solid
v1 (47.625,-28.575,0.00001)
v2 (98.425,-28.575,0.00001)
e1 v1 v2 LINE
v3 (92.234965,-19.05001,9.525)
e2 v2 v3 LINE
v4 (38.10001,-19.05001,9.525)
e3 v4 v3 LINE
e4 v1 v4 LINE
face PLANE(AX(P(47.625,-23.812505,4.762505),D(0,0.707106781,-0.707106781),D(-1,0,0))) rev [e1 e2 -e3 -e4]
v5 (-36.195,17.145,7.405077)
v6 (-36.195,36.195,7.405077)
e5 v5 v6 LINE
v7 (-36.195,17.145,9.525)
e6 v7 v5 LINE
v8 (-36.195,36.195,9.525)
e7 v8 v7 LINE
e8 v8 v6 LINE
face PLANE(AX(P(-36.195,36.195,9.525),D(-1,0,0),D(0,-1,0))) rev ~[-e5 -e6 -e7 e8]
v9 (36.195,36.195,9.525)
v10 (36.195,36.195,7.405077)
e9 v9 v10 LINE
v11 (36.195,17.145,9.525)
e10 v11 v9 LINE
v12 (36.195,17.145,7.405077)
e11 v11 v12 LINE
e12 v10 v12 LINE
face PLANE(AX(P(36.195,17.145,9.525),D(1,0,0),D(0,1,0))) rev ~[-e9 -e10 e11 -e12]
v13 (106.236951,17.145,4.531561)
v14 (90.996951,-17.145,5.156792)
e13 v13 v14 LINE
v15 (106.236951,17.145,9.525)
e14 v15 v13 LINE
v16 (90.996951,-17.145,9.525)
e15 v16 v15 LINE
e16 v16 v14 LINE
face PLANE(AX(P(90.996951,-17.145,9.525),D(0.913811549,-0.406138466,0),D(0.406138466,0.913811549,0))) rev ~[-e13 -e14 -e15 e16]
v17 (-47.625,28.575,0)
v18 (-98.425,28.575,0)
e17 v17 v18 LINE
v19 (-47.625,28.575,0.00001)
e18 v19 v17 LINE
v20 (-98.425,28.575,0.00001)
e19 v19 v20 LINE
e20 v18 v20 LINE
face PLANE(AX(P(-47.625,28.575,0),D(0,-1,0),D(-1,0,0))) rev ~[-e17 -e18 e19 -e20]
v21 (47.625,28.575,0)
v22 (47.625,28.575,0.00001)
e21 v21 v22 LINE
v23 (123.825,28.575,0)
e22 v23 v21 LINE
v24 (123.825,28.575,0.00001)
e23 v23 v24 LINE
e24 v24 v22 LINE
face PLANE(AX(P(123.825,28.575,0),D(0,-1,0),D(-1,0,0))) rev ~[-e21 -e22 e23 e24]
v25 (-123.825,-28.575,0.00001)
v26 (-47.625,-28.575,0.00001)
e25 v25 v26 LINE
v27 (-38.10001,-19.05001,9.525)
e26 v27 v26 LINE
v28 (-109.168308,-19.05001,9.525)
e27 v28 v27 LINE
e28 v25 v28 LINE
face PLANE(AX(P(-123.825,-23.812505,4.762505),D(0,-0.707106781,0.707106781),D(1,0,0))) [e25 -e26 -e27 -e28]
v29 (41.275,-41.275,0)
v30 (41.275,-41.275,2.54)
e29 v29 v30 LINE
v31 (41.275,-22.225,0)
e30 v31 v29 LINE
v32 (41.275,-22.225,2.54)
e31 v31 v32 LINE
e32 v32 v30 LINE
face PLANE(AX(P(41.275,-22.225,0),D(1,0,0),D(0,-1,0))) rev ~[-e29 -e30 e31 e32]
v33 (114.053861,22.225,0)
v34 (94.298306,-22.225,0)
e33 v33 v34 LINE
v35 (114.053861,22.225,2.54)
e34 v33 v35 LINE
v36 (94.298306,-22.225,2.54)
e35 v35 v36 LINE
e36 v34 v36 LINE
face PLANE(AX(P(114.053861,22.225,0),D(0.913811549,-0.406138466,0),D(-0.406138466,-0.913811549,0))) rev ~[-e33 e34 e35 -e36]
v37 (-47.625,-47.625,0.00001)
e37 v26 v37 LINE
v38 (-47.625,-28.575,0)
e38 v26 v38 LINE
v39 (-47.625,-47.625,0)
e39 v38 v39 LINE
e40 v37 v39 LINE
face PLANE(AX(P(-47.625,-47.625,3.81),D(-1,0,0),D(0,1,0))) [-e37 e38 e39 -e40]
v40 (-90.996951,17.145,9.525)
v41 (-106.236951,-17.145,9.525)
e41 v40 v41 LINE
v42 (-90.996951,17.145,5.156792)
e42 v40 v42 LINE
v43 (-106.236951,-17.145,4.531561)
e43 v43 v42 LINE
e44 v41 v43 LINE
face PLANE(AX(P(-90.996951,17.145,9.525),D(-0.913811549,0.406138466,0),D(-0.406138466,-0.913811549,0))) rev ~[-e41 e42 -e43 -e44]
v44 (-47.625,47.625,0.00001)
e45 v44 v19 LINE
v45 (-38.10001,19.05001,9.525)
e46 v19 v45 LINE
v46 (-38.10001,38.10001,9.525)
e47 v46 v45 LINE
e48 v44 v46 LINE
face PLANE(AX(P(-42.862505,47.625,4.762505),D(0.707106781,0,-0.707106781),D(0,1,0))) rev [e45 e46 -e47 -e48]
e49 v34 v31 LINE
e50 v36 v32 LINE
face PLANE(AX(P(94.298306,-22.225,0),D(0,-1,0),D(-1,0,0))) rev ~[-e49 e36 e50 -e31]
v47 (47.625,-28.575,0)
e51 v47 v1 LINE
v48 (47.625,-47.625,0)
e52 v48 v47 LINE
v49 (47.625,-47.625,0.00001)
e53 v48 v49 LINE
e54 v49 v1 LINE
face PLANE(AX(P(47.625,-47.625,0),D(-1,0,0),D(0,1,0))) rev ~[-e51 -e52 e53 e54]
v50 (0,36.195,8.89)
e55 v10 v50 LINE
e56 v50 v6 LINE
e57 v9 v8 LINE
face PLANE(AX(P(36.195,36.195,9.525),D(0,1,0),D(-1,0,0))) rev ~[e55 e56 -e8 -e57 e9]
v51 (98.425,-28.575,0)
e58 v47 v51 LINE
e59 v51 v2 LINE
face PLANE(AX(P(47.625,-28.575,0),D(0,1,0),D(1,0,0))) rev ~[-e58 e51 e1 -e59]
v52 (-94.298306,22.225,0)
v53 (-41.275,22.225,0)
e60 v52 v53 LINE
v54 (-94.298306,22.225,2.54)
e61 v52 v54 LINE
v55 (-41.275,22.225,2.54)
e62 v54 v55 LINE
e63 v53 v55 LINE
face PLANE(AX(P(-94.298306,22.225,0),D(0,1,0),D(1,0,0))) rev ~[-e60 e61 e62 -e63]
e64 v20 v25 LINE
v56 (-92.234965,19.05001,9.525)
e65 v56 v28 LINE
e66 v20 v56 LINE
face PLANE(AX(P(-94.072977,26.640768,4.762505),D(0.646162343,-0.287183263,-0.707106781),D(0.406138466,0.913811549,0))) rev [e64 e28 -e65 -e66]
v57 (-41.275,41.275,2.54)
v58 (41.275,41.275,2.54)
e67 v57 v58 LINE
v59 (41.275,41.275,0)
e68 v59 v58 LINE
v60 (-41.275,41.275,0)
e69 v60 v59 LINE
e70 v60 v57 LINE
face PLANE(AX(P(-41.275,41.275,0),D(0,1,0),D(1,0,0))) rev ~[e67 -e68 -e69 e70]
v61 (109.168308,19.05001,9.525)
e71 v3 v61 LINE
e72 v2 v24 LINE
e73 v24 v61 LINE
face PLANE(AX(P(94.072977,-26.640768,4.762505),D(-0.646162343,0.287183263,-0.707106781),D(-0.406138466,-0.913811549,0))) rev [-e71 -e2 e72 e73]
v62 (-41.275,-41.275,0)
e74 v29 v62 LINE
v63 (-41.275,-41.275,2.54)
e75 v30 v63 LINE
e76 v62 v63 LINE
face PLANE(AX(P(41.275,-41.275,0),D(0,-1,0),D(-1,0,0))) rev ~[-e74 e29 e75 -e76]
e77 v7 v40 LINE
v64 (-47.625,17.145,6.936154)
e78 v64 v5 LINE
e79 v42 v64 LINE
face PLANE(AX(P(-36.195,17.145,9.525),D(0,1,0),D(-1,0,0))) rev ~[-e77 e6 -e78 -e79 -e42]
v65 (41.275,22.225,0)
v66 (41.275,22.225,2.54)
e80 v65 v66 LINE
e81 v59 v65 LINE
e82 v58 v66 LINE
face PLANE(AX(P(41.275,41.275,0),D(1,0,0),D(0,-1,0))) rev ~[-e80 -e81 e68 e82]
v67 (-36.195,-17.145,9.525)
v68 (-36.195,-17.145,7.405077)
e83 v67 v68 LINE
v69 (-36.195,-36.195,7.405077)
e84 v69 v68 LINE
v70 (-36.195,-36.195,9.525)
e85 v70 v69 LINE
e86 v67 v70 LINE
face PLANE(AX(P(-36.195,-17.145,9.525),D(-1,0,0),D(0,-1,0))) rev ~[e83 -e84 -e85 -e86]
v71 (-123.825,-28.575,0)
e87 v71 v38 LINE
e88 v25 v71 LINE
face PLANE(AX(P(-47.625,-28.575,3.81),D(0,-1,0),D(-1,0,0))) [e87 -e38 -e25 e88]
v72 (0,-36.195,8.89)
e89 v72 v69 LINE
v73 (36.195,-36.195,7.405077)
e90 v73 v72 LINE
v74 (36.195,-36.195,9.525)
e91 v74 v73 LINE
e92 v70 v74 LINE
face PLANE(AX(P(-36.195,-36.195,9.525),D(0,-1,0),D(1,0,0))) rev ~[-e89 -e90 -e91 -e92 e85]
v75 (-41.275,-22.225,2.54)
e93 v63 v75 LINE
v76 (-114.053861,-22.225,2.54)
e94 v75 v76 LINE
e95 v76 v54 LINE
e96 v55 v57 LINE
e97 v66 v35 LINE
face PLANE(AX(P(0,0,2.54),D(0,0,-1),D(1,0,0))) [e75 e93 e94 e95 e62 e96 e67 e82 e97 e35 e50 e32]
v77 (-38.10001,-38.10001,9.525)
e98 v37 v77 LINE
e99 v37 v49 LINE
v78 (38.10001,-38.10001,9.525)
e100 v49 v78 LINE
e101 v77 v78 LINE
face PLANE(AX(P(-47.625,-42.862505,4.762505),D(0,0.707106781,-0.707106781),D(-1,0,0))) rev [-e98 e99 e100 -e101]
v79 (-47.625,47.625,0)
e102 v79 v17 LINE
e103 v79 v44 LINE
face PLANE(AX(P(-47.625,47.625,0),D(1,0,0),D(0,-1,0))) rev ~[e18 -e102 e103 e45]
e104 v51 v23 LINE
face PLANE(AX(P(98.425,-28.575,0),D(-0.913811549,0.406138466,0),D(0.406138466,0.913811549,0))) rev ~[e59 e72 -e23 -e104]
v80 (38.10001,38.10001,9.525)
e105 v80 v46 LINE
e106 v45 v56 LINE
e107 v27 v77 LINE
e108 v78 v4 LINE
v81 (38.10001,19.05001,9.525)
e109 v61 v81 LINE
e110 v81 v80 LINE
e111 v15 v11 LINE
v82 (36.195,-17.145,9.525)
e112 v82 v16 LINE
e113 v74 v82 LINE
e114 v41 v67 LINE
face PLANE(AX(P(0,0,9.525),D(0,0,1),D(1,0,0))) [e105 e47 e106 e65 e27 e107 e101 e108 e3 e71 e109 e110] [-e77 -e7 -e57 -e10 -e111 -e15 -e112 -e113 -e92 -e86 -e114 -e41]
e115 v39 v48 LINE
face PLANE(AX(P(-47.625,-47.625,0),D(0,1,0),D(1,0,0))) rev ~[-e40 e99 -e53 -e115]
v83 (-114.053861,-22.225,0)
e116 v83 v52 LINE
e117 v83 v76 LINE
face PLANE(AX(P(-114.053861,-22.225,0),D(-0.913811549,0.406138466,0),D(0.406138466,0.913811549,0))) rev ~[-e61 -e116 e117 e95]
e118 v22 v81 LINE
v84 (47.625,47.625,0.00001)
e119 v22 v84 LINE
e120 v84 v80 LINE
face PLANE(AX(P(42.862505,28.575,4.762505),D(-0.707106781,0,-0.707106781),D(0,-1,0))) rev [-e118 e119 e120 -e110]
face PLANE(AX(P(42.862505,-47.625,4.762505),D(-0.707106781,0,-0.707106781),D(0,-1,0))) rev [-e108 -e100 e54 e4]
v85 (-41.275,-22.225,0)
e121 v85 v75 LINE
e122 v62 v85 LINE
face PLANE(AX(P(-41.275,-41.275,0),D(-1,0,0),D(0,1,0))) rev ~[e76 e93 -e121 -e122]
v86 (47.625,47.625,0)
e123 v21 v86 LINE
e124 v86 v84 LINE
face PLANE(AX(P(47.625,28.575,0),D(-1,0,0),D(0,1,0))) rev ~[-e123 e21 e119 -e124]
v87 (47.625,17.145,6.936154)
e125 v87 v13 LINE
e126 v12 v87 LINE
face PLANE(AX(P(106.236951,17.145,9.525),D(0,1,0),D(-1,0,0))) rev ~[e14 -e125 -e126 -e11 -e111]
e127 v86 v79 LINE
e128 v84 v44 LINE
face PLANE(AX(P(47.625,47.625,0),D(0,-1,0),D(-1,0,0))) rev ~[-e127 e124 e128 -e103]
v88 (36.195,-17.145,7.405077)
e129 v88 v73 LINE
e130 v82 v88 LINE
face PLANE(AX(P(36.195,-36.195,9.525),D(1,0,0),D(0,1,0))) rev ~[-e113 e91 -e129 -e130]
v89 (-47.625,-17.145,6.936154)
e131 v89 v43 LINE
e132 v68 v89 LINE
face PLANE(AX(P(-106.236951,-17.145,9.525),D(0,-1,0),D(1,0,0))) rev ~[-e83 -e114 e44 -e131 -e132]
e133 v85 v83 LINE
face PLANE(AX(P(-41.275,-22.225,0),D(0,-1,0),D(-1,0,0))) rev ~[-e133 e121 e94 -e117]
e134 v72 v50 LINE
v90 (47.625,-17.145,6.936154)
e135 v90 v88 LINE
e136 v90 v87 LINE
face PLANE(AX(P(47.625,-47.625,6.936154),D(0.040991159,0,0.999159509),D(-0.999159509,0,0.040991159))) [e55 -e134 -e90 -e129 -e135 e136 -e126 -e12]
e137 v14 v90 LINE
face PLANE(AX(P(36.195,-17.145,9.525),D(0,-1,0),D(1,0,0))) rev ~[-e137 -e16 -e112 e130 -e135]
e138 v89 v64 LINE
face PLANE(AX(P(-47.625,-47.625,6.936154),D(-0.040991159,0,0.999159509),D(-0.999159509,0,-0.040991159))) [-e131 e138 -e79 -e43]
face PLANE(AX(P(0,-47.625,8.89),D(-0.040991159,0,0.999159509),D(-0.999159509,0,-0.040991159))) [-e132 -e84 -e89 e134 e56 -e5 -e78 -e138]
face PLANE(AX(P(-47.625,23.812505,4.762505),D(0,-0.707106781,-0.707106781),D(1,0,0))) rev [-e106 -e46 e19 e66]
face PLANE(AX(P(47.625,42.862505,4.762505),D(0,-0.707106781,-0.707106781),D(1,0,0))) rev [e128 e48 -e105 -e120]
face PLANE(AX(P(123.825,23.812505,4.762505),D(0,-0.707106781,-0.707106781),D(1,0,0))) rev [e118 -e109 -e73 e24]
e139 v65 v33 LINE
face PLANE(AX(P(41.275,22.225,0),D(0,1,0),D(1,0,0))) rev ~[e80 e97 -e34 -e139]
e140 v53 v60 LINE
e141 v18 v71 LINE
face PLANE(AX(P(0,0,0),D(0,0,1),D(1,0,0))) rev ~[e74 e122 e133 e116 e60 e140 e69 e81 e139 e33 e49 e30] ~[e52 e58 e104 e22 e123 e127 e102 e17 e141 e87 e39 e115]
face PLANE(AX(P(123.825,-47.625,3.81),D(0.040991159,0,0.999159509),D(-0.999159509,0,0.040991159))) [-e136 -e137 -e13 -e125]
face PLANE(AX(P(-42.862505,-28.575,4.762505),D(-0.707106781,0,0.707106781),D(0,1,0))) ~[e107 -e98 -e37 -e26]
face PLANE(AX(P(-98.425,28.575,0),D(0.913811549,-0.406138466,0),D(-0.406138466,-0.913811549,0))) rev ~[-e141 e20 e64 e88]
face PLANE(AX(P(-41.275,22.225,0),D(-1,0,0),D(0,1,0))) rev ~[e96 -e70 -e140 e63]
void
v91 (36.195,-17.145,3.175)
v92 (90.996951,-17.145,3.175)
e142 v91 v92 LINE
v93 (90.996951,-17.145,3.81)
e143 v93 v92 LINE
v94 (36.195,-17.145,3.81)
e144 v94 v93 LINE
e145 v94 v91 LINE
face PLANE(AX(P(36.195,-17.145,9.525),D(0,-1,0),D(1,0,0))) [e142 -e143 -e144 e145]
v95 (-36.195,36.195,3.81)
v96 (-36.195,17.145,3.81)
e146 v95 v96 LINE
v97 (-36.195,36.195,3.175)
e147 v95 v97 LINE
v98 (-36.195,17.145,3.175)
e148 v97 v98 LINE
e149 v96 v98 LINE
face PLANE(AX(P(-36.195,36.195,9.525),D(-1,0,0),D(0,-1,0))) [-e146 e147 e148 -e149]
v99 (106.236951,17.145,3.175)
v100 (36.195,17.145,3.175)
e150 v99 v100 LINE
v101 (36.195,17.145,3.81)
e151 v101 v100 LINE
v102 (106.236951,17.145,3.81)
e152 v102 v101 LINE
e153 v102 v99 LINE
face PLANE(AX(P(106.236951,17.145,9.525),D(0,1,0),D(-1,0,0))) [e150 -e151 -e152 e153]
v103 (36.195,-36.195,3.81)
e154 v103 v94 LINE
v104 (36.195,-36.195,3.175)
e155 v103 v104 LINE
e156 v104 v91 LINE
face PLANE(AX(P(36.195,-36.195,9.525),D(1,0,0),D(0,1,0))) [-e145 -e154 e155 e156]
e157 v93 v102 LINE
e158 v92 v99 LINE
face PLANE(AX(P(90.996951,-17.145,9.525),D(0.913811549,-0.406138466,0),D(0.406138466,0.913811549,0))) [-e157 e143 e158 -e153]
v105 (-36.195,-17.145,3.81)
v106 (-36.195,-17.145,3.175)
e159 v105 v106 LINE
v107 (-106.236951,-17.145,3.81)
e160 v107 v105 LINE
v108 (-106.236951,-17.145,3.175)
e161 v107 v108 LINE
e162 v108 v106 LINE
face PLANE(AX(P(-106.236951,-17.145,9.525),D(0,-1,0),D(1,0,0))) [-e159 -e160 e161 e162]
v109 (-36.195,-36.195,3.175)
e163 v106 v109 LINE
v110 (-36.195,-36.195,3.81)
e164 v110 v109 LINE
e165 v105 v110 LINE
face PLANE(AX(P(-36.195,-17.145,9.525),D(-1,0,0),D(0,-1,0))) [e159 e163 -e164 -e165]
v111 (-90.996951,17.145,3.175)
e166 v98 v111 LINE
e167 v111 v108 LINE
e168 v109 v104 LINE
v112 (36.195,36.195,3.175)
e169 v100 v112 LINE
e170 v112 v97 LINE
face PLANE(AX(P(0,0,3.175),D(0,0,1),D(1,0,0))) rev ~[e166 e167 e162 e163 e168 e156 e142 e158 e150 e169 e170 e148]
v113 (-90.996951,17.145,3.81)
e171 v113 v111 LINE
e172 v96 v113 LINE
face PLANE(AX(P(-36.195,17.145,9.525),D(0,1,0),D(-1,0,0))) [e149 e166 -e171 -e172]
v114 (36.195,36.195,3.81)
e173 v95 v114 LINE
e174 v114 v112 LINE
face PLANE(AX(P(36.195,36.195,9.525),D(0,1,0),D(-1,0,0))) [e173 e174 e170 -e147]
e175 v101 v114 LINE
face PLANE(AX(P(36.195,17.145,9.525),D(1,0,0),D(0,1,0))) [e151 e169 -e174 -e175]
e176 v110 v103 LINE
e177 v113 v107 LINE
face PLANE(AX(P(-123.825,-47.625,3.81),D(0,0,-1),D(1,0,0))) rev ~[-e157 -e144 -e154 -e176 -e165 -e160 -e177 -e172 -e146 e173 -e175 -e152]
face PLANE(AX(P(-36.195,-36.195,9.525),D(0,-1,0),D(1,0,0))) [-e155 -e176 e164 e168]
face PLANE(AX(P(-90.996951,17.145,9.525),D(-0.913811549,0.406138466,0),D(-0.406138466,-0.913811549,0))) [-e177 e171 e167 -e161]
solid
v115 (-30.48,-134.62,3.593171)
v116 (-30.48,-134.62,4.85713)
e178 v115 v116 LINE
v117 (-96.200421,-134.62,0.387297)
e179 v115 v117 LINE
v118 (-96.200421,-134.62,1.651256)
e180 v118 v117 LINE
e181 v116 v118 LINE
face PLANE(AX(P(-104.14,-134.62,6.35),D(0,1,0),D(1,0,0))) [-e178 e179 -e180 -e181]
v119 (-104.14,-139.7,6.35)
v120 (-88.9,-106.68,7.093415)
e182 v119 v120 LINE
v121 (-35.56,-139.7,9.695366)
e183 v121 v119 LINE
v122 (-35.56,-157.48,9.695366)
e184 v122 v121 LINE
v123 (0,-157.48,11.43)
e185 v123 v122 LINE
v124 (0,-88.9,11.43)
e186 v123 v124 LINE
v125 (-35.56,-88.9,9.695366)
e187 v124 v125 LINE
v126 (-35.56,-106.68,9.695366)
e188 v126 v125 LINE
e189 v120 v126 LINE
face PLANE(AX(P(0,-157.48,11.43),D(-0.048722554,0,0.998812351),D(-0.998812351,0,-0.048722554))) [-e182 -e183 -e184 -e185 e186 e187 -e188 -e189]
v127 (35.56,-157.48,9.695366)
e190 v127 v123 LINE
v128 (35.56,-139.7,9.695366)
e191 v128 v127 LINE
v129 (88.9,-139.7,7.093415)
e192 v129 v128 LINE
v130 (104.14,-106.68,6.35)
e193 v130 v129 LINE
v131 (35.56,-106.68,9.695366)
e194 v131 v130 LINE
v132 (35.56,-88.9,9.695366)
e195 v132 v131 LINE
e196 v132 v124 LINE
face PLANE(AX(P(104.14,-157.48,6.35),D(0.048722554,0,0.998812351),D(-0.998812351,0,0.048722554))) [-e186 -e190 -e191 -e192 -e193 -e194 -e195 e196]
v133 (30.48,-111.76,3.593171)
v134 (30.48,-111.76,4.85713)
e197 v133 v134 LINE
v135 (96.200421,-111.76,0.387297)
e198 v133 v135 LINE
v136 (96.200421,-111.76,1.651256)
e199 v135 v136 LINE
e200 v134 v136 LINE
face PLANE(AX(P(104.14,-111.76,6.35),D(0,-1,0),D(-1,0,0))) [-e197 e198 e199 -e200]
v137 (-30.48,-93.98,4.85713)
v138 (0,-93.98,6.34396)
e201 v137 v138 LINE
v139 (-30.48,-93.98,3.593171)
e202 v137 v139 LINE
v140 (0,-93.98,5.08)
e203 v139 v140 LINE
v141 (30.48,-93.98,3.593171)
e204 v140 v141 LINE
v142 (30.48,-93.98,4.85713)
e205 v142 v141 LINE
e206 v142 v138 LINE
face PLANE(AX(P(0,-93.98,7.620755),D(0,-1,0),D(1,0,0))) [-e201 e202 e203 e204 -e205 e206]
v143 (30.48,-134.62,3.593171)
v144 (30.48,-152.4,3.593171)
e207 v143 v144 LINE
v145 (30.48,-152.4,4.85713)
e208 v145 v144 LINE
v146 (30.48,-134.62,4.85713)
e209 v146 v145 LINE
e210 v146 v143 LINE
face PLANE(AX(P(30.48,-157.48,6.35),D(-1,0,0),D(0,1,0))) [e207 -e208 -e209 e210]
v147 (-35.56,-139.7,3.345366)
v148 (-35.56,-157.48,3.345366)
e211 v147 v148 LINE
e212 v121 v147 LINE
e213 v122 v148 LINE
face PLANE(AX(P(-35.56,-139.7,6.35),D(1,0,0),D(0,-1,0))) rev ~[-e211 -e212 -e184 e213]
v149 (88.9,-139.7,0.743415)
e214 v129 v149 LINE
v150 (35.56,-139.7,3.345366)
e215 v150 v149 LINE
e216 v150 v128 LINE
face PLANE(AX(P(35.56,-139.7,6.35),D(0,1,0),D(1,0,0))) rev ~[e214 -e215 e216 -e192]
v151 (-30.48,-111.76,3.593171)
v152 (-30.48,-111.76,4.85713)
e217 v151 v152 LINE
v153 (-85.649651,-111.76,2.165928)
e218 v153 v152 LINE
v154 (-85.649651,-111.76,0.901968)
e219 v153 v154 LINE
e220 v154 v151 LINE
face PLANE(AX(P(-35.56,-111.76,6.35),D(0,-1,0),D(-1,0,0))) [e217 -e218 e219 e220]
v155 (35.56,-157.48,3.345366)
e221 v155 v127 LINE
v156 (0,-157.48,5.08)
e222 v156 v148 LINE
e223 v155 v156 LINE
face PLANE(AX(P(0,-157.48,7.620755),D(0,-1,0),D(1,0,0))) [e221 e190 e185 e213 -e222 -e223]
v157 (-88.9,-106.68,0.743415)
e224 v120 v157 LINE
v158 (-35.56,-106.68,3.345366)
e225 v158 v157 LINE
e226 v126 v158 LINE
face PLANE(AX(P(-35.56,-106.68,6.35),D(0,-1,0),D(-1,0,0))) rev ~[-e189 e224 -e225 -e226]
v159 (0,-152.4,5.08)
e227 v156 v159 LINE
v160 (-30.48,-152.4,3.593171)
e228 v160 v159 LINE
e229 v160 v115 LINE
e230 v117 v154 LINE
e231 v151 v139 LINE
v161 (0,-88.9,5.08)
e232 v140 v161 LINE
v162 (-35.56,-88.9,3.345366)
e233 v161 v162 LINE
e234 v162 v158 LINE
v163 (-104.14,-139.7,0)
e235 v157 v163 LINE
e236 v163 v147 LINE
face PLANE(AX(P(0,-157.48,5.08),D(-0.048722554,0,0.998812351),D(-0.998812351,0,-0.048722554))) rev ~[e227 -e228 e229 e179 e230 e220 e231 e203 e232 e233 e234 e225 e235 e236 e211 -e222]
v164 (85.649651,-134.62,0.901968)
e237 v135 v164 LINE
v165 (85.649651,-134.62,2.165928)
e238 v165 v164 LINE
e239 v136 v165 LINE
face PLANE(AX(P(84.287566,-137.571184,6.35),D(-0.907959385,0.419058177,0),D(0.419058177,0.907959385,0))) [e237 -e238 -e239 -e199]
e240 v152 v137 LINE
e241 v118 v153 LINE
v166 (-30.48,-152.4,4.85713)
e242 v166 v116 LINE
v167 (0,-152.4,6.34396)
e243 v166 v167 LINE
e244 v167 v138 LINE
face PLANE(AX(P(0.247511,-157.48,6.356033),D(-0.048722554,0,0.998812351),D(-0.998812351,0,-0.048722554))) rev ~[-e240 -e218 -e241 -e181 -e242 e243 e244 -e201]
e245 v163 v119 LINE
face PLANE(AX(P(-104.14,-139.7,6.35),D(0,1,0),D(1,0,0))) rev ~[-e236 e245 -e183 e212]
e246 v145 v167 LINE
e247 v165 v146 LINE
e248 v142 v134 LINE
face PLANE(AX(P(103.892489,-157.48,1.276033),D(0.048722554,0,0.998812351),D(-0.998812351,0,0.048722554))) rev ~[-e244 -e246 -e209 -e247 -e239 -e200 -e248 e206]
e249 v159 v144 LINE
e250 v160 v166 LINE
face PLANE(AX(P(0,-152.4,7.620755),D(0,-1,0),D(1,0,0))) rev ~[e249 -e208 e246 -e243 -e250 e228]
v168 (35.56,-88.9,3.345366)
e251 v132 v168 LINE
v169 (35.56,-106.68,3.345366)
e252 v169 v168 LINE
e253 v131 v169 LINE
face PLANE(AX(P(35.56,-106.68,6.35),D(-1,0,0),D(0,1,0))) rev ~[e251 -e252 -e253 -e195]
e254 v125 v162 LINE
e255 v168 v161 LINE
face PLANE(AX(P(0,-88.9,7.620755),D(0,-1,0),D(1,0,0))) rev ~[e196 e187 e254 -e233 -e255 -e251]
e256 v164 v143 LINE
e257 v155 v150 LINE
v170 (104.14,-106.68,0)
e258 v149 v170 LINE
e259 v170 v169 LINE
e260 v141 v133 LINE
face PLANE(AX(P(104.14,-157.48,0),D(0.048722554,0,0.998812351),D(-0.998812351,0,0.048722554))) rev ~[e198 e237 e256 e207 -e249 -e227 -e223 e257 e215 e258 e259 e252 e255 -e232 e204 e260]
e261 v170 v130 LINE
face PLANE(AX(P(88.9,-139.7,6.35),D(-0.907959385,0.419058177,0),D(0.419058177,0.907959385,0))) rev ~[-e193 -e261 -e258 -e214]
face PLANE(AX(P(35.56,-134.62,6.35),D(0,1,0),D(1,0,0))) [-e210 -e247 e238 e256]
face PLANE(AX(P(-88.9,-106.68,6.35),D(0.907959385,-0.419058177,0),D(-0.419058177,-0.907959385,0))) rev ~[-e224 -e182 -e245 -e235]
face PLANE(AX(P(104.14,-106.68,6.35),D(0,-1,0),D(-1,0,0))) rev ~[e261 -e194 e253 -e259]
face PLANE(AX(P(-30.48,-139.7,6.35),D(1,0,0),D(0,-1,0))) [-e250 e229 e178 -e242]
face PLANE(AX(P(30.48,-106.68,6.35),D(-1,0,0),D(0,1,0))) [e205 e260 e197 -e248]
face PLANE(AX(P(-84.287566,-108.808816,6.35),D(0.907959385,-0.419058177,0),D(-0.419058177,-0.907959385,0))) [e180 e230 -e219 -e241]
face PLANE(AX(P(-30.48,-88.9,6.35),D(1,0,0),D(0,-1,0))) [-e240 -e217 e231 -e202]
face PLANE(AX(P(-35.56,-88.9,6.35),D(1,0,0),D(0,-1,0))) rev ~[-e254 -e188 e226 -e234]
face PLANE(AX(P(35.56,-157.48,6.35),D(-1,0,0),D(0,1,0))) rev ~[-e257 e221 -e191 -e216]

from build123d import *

# Parameters (mm, degrees)
F1_DEPTH  = 9.525
F3_DEPTH  = 6.35
F5_DEPTH  = 83.82
F6_DEPTH  = 3.1271538462
F7_SIZE   = 9.52499
F9_DEPTH  = 6.35
F11_DEPTH = 68.58
F12_DEPTH = 3.3463658537
F14_DEPTH = 68.58
F15_T     = -5.08
F17_DEPTH = 2.54


# Not quite as in the source:
# - a fillet or chamfer is up to 0.001 mm smaller than in the source, because OpenCascade refuses the exact size
# - a length typed as a fraction of an inch, garbled in the dataset ("3 / 203.2 mm" for 3/8 in), is restored


with BuildPart() as f1:
    # F0 (on Top) → F1 (new body)
    with BuildSketch(Plane.XY):
        Polygon((-47.625, 28.575), (-98.425, 28.575), (-123.825, -28.575), (-47.625, -28.575), (-47.625, -47.625), (47.625, -47.625), (47.625, -28.575), (98.425, -28.575), (123.825, 28.575), (47.625, 28.575), (47.625, 47.625), (-47.625, 47.625), align=None)
    extrude(amount=F1_DEPTH)

    # F2 (on face) → F3 (cut)
    with BuildSketch(Plane.XY.offset(9.525)):
        Polygon((-36.195, 36.195), (-36.195, 17.145), (-90.9969505917, 17.145), (-106.2369505917, -17.145), (-36.195, -17.145), (-36.195, -36.195), (36.195, -36.195), (36.195, -17.145), (90.9969505917, -17.145), (106.2369505917, 17.145), (36.195, 17.145), (36.195, 36.195), align=None)
    extrude(amount=-F3_DEPTH, mode=Mode.SUBTRACT)

    # F4 (on face) → F5 (join, through all)
    with BuildSketch(Plane.XZ.offset(47.625)):
        Polygon((-47.625, 6.9361538462), (-47.625, 3.81), (47.625, 3.81), (47.625, 6.9361538462), (0, 8.89), align=None)
        Polygon((-47.625, 6.9361538462), (-123.825, 3.81), (-47.625, 3.81), align=None)
        Polygon((47.625, 6.9361538462), (47.625, 3.81), (123.825, 3.81), align=None)
    extrude(amount=-F5_DEPTH)

    # F6 (cut, through all): faces of the model
    f6_faces = [f1.faces().sort_by_distance(p)[0] for p in [
        (-85.725, -38.1, 3.81),
        (85.725, -46.5473692655, 3.81),
        (85.725, 32.385, 3.81),
        (-112.0388843262, 0.4061708117, 3.81),
    ]]
    extrude(f6_faces, amount=-F6_DEPTH, mode=Mode.SUBTRACT)

    # F7 (size 9.525 in the source; OpenCascade refuses exactly that, so slightly less here)
    f7_edges = [f1.edges().sort_by_distance(p)[0] for p in [
        (-111.125, 0, 9.525),
        (-73.025, 28.575, 9.525),
        (0, 47.625, 9.525),
        (-47.625, 38.1, 9.525),
        (47.625, 38.1, 9.525),
        (85.725, 28.575, 9.525),
        (111.125, 0, 9.525),
        (73.025, -28.575, 9.525),
        (47.625, -38.1, 9.525),
        (0, -47.625, 9.525),
        (-47.625, -38.1, 9.525),
        (-85.725, -28.575, 9.525),
    ]]
    chamfer(f7_edges, length=F7_SIZE)

    # F16 (on face) → F17 (cut)
    with BuildSketch(Plane(origin=(0, 0, 0), x_dir=(1, 0, 0), z_dir=(0, 0, -1))):
        Polygon((-41.275, 41.275), (-41.275, 22.225), (-114.0538614398, 22.225), (-94.2983058843, -22.225), (-41.275, -22.225), (-41.275, -41.275), (41.275, -41.275), (41.275, -22.225), (114.0538614398, -22.225), (94.2983058843, 22.225), (41.275, 22.225), (41.275, 41.275), align=None)
    extrude(amount=-F17_DEPTH, mode=Mode.SUBTRACT)


with BuildPart() as f9:
    # F8 (on Top) → F9 (new body)
    with BuildSketch(Plane.XY):
        Polygon((-35.56, -106.68), (-88.9, -106.68), (-104.14, -139.7), (-35.56, -139.7), (-35.56, -157.48), (35.56, -157.48), (35.56, -139.7), (88.9, -139.7), (104.14, -106.68), (35.56, -106.68), (35.56, -88.9), (-35.56, -88.9), align=None)
    extrude(amount=F9_DEPTH)

    # F10 (on face) → F11 (join, through all)
    with BuildSketch(Plane.XZ.offset(157.48)):
        Polygon((0, 11.43), (-104.14, 6.35), (104.14, 6.35), align=None)
    extrude(amount=-F11_DEPTH)

    # F12 (cut, through all): faces of the model
    f12_faces = [f9.faces().sort_by_distance(p)[0] for p in [
        (-69.85, -148.59, 6.35),
        (-74.8464473684, -101.193377193, 6.35),
        (74.8464473684, -145.186622807, 6.35),
        (69.85, -97.79, 6.35),
    ]]
    extrude(f12_faces, amount=-F12_DEPTH, mode=Mode.SUBTRACT)

    # F13 (on face) → F14 (cut, through all)
    with BuildSketch(Plane.XZ.offset(157.48)):
        Polygon((0, 5.08), (-104.14, 0), (104.14, 0), align=None)
    extrude(amount=-F14_DEPTH, mode=Mode.SUBTRACT)

    # F15
    f15_openings = [f9.faces().sort_by_distance(p)[0] for p in [
        (-39.673696, -123.501058, 3.144698),
        (39.673696, -122.878942, 3.144698),
    ]]
    offset(amount=F15_T, openings=f15_openings, kind=Kind.INTERSECTION)


solid = Compound([f1.part, f9.part])
